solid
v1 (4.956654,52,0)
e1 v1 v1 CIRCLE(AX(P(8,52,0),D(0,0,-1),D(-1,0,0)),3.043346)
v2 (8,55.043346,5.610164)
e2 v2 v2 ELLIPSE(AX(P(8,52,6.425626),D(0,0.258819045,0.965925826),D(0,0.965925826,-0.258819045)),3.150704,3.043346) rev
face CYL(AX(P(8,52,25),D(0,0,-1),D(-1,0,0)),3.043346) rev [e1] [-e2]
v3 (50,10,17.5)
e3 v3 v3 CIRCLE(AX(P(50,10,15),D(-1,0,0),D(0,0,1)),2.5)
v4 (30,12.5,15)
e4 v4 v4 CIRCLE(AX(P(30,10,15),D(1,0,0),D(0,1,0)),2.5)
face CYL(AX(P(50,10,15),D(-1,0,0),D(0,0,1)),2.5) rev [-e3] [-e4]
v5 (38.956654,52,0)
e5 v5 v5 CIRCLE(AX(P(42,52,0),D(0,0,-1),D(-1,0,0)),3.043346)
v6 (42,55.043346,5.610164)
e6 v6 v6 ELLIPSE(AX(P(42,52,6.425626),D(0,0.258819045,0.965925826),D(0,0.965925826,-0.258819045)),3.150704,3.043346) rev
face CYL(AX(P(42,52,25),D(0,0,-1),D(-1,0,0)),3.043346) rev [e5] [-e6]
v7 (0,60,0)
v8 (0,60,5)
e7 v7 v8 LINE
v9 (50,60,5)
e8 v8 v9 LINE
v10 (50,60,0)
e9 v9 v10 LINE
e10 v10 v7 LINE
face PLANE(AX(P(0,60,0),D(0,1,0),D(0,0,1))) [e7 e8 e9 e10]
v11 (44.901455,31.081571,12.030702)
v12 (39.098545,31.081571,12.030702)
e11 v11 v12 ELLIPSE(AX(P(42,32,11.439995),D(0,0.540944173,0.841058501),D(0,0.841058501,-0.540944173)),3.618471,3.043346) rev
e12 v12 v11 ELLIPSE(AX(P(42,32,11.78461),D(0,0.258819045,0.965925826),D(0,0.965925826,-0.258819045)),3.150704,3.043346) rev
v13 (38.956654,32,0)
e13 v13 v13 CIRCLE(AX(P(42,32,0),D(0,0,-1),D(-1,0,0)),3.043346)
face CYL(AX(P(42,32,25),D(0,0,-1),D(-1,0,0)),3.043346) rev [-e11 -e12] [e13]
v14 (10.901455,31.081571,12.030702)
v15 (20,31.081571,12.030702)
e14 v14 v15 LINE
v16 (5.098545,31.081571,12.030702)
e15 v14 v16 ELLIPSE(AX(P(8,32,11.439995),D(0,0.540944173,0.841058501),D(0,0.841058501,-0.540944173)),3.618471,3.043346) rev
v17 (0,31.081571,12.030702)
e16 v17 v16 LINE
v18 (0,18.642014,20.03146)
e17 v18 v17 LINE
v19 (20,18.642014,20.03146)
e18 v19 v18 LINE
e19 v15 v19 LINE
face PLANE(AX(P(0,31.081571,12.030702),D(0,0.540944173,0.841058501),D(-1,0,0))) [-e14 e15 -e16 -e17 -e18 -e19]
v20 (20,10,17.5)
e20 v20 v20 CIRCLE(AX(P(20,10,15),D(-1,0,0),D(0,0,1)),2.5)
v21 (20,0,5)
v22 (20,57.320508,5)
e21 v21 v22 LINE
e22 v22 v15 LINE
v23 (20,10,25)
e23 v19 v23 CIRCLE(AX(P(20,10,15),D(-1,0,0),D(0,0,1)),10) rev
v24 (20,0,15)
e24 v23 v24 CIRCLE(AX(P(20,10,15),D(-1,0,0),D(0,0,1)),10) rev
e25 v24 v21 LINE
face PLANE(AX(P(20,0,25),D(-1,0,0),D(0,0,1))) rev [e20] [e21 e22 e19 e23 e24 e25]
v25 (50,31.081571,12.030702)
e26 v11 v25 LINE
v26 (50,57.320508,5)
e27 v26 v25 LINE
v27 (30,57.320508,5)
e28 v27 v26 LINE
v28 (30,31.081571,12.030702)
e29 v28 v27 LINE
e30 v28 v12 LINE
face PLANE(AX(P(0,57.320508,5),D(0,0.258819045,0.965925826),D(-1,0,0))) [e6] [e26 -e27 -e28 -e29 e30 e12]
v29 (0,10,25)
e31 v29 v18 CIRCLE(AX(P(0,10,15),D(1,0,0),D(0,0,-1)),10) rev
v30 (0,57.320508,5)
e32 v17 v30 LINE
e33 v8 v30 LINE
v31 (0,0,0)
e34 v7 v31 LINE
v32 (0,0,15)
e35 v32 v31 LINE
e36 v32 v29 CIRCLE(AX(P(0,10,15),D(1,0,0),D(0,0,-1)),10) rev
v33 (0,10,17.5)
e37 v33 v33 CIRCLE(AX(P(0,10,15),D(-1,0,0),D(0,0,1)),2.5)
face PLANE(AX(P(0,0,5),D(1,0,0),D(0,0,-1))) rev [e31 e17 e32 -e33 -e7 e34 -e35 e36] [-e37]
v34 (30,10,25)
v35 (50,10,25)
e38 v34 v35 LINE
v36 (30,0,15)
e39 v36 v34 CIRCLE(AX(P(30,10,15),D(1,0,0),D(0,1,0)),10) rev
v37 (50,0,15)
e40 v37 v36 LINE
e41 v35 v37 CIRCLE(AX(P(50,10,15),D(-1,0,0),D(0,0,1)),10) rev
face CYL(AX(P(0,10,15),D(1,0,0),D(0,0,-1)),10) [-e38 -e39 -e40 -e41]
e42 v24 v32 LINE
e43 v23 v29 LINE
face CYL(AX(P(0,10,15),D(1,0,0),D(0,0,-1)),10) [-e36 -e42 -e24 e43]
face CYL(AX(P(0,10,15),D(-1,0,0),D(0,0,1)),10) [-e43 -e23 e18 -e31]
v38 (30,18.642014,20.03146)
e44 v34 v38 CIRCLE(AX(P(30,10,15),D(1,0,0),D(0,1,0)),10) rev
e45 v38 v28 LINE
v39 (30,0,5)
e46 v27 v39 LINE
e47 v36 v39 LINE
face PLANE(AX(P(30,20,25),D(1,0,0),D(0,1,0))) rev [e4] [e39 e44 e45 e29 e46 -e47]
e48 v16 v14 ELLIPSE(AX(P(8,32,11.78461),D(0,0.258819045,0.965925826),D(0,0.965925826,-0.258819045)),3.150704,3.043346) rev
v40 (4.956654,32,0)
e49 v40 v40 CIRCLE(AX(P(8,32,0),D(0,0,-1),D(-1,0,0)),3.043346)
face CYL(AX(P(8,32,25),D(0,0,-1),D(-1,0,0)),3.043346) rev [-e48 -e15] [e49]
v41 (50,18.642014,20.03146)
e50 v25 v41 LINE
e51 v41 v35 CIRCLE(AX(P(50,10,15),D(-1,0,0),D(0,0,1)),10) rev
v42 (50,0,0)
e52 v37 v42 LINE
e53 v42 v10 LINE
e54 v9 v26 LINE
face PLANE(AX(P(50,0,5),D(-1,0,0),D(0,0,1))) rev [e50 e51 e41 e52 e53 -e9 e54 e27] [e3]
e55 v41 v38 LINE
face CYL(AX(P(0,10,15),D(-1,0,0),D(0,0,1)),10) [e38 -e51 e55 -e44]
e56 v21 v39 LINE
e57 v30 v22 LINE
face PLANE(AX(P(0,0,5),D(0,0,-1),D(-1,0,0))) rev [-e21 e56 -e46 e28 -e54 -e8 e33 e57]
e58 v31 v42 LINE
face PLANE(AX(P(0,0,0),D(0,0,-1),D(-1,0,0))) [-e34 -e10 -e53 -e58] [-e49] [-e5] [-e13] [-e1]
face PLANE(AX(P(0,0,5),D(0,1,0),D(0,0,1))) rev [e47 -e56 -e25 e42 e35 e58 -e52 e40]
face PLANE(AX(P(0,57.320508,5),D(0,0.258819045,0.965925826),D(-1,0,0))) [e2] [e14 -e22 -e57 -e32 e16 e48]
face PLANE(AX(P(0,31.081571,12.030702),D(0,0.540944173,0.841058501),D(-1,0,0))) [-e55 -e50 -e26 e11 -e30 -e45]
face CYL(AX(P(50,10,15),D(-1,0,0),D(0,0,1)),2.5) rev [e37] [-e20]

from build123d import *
from OCP.BRepFilletAPI import BRepFilletAPI_MakeChamfer

# Parameters (mm, degrees)
SZKIC1_W                    = 50
SZKIC1_H                    = 20
DODANIE_WYCI_GNI_CIE1_DEPTH = 5
SZKIC2_W                    = 20
SZKIC2_H                    = 20
DODANIE_WYCI_GNI_CIE2_DEPTH = 20
SZKIC3_R                    = 2.5
WYTNIJ_WYCI_GNI_CIE1_DEPTH  = 60.371710435
ZAOKR_GLENIE1_R             = 10
SZKIC4_W                    = 50
SZKIC4_H                    = 5
DODANIE_WYCI_GNI_CIE3_DEPTH = 40
SFAZOWANIE1_SIZE            = 10
SFAZOWANIE1_SIZE2           = 37.320508076
SFAZOWANIE2_OUTLINE_R       = 2.5
SFAZOWANIE2_DEPTH           = 20
SFAZOWANIE2_START           = 30
SFAZOWANIE2_2_OUTLINE_R     = 2.5
SFAZOWANIE2_2_DEPTH         = 20
SZKIC5_R                    = 3.043345969
WYTNIJ_WYCI_GNI_CIE2_DEPTH  = 83.006097334


with BuildPart() as part:
    # Szkic1 → Dodanie-wyciągnięcie1 (new body)
    with BuildSketch(Plane.XY):
        with Locations((25, 10)):
            Rectangle(SZKIC1_W, SZKIC1_H)
    extrude(amount=DODANIE_WYCI_GNI_CIE1_DEPTH)

    # Szkic2 → Dodanie-wyciągnięcie2 (add)
    with BuildSketch(Plane.XY.offset(5)):
        with Locations((10, 10)):
            Rectangle(SZKIC2_W, SZKIC2_H)
        with Locations((40, 10)):
            Rectangle(SZKIC2_W, SZKIC2_H)
    extrude(amount=DODANIE_WYCI_GNI_CIE2_DEPTH)

    # Szkic3 → Wytnij-wyciągnięcie1 (cut, through all)
    with BuildSketch(Plane.ZY):
        with Locations((15, 10)):
            Circle(SZKIC3_R)
    extrude(amount=-WYTNIJ_WYCI_GNI_CIE1_DEPTH, mode=Mode.SUBTRACT)

    # Zaokrąglenie1
    zaokr_glenie1_edges = [part.edges().sort_by_distance(p)[0] for p in [
        (40, 20, 25),
        (40, 0, 25),
        (10, 0, 25),
        (10, 20, 25),
    ]]
    fillet(zaokr_glenie1_edges, radius=ZAOKR_GLENIE1_R - 0.0001)  # a hair under: the kernel refuses the full size

    # Szkic4 → Dodanie-wyciągnięcie3 (add)
    with BuildSketch(Plane(origin=(0, 20, 0), x_dir=(1, 0, 0), z_dir=(0, 1, 0))):
        with Locations((25, -2.5)):
            Rectangle(SZKIC4_W, SZKIC4_H)
    extrude(amount=DODANIE_WYCI_GNI_CIE3_DEPTH)

    # Sfazowanie1: one chamfer whose edges measure the first distance from different faces: ONE call of the kernel's chamfer builder (chamfer() names one face for all edges)
    sfazowanie1_edges_1 = [part.edges().sort_by_distance(p)[0] for p in [
        (40, 20, 5),
    ]]
    sfazowanie1_side_1 = [part.faces().sort_by_distance(p)[0] for p in [
        (40, 20, 10.00005),
    ]]
    sfazowanie1_edges_2 = [part.edges().sort_by_distance(p)[0] for p in [
        (10, 20, 5),
    ]]
    sfazowanie1_side_2 = [part.faces().sort_by_distance(p)[0] for p in [
        (10, 20, 10.00005),
    ]]
    sfazowanie1 = BRepFilletAPI_MakeChamfer(part.part.solid().wrapped)
    for e in sfazowanie1_edges_1:
        sfazowanie1.Add(SFAZOWANIE1_SIZE, SFAZOWANIE1_SIZE2, e.wrapped, sfazowanie1_side_1[0].wrapped)  # the first distance lies on this face
    for e in sfazowanie1_edges_2:
        sfazowanie1.Add(SFAZOWANIE1_SIZE, SFAZOWANIE1_SIZE2, e.wrapped, sfazowanie1_side_2[0].wrapped)  # the first distance lies on this face
    add(Compound.cast(sfazowanie1.Shape()), mode=Mode.REPLACE)

    # Sfazowanie2: read off the stored shape, not the designer's step
    # Sfazowanie2 outline → Sfazowanie2 (add)
    with BuildSketch(Plane.YZ):
        with BuildLine():
            Line((0, 15), (0, 0))
            Line((0, 0), (60, 0))
            Line((60, 0), (60, 5))
            Line((60, 5), (57.320508076, 5))
            Line((57.320508076, 5), (31.081570656, 12.030702092))
            Line((31.081570656, 12.030702092), (18.642014143, 20.031460181))
            ThreePointArc((18.642014143, 20.031460181), (7.394250725, 24.654536276), (0, 15))
        make_face()
        with Locations((10, 15)):
            Circle(SFAZOWANIE2_OUTLINE_R, mode=Mode.SUBTRACT)
    extrude(amount=SFAZOWANIE2_DEPTH)

    # Sfazowanie2 2 outline → Sfazowanie2 2 (add)
    with BuildSketch(Plane.YZ.offset(SFAZOWANIE2_START)):
        with BuildLine():
            Line((0, 15), (0, 0))
            Line((0, 0), (60, 0))
            Line((60, 0), (60, 5))
            Line((60, 5), (57.320508076, 5))
            Line((57.320508076, 5), (31.081570656, 12.030702092))
            Line((31.081570656, 12.030702092), (18.642014143, 20.031460181))
            ThreePointArc((18.642014143, 20.031460181), (7.394250725, 24.654536276), (0, 15))
        make_face()
        with Locations((10, 15)):
            Circle(SFAZOWANIE2_2_OUTLINE_R, mode=Mode.SUBTRACT)
    extrude(amount=SFAZOWANIE2_2_DEPTH)

    # Szkic5 → Wytnij-wyciągnięcie2 (cut, through all)
    with BuildSketch(Plane(origin=(0, 0, 0), x_dir=(-1, 0, 0), z_dir=(0, 0, -1))):
        with Locations((-42, 52)):
            Circle(SZKIC5_R)
        with Locations((-8, 52)):
            Circle(SZKIC5_R)
        with Locations((-8, 32)):
            Circle(SZKIC5_R)
        with Locations((-42, 32)):
            Circle(SZKIC5_R)
    extrude(amount=-WYTNIJ_WYCI_GNI_CIE2_DEPTH, mode=Mode.SUBTRACT)


solid = part.part
